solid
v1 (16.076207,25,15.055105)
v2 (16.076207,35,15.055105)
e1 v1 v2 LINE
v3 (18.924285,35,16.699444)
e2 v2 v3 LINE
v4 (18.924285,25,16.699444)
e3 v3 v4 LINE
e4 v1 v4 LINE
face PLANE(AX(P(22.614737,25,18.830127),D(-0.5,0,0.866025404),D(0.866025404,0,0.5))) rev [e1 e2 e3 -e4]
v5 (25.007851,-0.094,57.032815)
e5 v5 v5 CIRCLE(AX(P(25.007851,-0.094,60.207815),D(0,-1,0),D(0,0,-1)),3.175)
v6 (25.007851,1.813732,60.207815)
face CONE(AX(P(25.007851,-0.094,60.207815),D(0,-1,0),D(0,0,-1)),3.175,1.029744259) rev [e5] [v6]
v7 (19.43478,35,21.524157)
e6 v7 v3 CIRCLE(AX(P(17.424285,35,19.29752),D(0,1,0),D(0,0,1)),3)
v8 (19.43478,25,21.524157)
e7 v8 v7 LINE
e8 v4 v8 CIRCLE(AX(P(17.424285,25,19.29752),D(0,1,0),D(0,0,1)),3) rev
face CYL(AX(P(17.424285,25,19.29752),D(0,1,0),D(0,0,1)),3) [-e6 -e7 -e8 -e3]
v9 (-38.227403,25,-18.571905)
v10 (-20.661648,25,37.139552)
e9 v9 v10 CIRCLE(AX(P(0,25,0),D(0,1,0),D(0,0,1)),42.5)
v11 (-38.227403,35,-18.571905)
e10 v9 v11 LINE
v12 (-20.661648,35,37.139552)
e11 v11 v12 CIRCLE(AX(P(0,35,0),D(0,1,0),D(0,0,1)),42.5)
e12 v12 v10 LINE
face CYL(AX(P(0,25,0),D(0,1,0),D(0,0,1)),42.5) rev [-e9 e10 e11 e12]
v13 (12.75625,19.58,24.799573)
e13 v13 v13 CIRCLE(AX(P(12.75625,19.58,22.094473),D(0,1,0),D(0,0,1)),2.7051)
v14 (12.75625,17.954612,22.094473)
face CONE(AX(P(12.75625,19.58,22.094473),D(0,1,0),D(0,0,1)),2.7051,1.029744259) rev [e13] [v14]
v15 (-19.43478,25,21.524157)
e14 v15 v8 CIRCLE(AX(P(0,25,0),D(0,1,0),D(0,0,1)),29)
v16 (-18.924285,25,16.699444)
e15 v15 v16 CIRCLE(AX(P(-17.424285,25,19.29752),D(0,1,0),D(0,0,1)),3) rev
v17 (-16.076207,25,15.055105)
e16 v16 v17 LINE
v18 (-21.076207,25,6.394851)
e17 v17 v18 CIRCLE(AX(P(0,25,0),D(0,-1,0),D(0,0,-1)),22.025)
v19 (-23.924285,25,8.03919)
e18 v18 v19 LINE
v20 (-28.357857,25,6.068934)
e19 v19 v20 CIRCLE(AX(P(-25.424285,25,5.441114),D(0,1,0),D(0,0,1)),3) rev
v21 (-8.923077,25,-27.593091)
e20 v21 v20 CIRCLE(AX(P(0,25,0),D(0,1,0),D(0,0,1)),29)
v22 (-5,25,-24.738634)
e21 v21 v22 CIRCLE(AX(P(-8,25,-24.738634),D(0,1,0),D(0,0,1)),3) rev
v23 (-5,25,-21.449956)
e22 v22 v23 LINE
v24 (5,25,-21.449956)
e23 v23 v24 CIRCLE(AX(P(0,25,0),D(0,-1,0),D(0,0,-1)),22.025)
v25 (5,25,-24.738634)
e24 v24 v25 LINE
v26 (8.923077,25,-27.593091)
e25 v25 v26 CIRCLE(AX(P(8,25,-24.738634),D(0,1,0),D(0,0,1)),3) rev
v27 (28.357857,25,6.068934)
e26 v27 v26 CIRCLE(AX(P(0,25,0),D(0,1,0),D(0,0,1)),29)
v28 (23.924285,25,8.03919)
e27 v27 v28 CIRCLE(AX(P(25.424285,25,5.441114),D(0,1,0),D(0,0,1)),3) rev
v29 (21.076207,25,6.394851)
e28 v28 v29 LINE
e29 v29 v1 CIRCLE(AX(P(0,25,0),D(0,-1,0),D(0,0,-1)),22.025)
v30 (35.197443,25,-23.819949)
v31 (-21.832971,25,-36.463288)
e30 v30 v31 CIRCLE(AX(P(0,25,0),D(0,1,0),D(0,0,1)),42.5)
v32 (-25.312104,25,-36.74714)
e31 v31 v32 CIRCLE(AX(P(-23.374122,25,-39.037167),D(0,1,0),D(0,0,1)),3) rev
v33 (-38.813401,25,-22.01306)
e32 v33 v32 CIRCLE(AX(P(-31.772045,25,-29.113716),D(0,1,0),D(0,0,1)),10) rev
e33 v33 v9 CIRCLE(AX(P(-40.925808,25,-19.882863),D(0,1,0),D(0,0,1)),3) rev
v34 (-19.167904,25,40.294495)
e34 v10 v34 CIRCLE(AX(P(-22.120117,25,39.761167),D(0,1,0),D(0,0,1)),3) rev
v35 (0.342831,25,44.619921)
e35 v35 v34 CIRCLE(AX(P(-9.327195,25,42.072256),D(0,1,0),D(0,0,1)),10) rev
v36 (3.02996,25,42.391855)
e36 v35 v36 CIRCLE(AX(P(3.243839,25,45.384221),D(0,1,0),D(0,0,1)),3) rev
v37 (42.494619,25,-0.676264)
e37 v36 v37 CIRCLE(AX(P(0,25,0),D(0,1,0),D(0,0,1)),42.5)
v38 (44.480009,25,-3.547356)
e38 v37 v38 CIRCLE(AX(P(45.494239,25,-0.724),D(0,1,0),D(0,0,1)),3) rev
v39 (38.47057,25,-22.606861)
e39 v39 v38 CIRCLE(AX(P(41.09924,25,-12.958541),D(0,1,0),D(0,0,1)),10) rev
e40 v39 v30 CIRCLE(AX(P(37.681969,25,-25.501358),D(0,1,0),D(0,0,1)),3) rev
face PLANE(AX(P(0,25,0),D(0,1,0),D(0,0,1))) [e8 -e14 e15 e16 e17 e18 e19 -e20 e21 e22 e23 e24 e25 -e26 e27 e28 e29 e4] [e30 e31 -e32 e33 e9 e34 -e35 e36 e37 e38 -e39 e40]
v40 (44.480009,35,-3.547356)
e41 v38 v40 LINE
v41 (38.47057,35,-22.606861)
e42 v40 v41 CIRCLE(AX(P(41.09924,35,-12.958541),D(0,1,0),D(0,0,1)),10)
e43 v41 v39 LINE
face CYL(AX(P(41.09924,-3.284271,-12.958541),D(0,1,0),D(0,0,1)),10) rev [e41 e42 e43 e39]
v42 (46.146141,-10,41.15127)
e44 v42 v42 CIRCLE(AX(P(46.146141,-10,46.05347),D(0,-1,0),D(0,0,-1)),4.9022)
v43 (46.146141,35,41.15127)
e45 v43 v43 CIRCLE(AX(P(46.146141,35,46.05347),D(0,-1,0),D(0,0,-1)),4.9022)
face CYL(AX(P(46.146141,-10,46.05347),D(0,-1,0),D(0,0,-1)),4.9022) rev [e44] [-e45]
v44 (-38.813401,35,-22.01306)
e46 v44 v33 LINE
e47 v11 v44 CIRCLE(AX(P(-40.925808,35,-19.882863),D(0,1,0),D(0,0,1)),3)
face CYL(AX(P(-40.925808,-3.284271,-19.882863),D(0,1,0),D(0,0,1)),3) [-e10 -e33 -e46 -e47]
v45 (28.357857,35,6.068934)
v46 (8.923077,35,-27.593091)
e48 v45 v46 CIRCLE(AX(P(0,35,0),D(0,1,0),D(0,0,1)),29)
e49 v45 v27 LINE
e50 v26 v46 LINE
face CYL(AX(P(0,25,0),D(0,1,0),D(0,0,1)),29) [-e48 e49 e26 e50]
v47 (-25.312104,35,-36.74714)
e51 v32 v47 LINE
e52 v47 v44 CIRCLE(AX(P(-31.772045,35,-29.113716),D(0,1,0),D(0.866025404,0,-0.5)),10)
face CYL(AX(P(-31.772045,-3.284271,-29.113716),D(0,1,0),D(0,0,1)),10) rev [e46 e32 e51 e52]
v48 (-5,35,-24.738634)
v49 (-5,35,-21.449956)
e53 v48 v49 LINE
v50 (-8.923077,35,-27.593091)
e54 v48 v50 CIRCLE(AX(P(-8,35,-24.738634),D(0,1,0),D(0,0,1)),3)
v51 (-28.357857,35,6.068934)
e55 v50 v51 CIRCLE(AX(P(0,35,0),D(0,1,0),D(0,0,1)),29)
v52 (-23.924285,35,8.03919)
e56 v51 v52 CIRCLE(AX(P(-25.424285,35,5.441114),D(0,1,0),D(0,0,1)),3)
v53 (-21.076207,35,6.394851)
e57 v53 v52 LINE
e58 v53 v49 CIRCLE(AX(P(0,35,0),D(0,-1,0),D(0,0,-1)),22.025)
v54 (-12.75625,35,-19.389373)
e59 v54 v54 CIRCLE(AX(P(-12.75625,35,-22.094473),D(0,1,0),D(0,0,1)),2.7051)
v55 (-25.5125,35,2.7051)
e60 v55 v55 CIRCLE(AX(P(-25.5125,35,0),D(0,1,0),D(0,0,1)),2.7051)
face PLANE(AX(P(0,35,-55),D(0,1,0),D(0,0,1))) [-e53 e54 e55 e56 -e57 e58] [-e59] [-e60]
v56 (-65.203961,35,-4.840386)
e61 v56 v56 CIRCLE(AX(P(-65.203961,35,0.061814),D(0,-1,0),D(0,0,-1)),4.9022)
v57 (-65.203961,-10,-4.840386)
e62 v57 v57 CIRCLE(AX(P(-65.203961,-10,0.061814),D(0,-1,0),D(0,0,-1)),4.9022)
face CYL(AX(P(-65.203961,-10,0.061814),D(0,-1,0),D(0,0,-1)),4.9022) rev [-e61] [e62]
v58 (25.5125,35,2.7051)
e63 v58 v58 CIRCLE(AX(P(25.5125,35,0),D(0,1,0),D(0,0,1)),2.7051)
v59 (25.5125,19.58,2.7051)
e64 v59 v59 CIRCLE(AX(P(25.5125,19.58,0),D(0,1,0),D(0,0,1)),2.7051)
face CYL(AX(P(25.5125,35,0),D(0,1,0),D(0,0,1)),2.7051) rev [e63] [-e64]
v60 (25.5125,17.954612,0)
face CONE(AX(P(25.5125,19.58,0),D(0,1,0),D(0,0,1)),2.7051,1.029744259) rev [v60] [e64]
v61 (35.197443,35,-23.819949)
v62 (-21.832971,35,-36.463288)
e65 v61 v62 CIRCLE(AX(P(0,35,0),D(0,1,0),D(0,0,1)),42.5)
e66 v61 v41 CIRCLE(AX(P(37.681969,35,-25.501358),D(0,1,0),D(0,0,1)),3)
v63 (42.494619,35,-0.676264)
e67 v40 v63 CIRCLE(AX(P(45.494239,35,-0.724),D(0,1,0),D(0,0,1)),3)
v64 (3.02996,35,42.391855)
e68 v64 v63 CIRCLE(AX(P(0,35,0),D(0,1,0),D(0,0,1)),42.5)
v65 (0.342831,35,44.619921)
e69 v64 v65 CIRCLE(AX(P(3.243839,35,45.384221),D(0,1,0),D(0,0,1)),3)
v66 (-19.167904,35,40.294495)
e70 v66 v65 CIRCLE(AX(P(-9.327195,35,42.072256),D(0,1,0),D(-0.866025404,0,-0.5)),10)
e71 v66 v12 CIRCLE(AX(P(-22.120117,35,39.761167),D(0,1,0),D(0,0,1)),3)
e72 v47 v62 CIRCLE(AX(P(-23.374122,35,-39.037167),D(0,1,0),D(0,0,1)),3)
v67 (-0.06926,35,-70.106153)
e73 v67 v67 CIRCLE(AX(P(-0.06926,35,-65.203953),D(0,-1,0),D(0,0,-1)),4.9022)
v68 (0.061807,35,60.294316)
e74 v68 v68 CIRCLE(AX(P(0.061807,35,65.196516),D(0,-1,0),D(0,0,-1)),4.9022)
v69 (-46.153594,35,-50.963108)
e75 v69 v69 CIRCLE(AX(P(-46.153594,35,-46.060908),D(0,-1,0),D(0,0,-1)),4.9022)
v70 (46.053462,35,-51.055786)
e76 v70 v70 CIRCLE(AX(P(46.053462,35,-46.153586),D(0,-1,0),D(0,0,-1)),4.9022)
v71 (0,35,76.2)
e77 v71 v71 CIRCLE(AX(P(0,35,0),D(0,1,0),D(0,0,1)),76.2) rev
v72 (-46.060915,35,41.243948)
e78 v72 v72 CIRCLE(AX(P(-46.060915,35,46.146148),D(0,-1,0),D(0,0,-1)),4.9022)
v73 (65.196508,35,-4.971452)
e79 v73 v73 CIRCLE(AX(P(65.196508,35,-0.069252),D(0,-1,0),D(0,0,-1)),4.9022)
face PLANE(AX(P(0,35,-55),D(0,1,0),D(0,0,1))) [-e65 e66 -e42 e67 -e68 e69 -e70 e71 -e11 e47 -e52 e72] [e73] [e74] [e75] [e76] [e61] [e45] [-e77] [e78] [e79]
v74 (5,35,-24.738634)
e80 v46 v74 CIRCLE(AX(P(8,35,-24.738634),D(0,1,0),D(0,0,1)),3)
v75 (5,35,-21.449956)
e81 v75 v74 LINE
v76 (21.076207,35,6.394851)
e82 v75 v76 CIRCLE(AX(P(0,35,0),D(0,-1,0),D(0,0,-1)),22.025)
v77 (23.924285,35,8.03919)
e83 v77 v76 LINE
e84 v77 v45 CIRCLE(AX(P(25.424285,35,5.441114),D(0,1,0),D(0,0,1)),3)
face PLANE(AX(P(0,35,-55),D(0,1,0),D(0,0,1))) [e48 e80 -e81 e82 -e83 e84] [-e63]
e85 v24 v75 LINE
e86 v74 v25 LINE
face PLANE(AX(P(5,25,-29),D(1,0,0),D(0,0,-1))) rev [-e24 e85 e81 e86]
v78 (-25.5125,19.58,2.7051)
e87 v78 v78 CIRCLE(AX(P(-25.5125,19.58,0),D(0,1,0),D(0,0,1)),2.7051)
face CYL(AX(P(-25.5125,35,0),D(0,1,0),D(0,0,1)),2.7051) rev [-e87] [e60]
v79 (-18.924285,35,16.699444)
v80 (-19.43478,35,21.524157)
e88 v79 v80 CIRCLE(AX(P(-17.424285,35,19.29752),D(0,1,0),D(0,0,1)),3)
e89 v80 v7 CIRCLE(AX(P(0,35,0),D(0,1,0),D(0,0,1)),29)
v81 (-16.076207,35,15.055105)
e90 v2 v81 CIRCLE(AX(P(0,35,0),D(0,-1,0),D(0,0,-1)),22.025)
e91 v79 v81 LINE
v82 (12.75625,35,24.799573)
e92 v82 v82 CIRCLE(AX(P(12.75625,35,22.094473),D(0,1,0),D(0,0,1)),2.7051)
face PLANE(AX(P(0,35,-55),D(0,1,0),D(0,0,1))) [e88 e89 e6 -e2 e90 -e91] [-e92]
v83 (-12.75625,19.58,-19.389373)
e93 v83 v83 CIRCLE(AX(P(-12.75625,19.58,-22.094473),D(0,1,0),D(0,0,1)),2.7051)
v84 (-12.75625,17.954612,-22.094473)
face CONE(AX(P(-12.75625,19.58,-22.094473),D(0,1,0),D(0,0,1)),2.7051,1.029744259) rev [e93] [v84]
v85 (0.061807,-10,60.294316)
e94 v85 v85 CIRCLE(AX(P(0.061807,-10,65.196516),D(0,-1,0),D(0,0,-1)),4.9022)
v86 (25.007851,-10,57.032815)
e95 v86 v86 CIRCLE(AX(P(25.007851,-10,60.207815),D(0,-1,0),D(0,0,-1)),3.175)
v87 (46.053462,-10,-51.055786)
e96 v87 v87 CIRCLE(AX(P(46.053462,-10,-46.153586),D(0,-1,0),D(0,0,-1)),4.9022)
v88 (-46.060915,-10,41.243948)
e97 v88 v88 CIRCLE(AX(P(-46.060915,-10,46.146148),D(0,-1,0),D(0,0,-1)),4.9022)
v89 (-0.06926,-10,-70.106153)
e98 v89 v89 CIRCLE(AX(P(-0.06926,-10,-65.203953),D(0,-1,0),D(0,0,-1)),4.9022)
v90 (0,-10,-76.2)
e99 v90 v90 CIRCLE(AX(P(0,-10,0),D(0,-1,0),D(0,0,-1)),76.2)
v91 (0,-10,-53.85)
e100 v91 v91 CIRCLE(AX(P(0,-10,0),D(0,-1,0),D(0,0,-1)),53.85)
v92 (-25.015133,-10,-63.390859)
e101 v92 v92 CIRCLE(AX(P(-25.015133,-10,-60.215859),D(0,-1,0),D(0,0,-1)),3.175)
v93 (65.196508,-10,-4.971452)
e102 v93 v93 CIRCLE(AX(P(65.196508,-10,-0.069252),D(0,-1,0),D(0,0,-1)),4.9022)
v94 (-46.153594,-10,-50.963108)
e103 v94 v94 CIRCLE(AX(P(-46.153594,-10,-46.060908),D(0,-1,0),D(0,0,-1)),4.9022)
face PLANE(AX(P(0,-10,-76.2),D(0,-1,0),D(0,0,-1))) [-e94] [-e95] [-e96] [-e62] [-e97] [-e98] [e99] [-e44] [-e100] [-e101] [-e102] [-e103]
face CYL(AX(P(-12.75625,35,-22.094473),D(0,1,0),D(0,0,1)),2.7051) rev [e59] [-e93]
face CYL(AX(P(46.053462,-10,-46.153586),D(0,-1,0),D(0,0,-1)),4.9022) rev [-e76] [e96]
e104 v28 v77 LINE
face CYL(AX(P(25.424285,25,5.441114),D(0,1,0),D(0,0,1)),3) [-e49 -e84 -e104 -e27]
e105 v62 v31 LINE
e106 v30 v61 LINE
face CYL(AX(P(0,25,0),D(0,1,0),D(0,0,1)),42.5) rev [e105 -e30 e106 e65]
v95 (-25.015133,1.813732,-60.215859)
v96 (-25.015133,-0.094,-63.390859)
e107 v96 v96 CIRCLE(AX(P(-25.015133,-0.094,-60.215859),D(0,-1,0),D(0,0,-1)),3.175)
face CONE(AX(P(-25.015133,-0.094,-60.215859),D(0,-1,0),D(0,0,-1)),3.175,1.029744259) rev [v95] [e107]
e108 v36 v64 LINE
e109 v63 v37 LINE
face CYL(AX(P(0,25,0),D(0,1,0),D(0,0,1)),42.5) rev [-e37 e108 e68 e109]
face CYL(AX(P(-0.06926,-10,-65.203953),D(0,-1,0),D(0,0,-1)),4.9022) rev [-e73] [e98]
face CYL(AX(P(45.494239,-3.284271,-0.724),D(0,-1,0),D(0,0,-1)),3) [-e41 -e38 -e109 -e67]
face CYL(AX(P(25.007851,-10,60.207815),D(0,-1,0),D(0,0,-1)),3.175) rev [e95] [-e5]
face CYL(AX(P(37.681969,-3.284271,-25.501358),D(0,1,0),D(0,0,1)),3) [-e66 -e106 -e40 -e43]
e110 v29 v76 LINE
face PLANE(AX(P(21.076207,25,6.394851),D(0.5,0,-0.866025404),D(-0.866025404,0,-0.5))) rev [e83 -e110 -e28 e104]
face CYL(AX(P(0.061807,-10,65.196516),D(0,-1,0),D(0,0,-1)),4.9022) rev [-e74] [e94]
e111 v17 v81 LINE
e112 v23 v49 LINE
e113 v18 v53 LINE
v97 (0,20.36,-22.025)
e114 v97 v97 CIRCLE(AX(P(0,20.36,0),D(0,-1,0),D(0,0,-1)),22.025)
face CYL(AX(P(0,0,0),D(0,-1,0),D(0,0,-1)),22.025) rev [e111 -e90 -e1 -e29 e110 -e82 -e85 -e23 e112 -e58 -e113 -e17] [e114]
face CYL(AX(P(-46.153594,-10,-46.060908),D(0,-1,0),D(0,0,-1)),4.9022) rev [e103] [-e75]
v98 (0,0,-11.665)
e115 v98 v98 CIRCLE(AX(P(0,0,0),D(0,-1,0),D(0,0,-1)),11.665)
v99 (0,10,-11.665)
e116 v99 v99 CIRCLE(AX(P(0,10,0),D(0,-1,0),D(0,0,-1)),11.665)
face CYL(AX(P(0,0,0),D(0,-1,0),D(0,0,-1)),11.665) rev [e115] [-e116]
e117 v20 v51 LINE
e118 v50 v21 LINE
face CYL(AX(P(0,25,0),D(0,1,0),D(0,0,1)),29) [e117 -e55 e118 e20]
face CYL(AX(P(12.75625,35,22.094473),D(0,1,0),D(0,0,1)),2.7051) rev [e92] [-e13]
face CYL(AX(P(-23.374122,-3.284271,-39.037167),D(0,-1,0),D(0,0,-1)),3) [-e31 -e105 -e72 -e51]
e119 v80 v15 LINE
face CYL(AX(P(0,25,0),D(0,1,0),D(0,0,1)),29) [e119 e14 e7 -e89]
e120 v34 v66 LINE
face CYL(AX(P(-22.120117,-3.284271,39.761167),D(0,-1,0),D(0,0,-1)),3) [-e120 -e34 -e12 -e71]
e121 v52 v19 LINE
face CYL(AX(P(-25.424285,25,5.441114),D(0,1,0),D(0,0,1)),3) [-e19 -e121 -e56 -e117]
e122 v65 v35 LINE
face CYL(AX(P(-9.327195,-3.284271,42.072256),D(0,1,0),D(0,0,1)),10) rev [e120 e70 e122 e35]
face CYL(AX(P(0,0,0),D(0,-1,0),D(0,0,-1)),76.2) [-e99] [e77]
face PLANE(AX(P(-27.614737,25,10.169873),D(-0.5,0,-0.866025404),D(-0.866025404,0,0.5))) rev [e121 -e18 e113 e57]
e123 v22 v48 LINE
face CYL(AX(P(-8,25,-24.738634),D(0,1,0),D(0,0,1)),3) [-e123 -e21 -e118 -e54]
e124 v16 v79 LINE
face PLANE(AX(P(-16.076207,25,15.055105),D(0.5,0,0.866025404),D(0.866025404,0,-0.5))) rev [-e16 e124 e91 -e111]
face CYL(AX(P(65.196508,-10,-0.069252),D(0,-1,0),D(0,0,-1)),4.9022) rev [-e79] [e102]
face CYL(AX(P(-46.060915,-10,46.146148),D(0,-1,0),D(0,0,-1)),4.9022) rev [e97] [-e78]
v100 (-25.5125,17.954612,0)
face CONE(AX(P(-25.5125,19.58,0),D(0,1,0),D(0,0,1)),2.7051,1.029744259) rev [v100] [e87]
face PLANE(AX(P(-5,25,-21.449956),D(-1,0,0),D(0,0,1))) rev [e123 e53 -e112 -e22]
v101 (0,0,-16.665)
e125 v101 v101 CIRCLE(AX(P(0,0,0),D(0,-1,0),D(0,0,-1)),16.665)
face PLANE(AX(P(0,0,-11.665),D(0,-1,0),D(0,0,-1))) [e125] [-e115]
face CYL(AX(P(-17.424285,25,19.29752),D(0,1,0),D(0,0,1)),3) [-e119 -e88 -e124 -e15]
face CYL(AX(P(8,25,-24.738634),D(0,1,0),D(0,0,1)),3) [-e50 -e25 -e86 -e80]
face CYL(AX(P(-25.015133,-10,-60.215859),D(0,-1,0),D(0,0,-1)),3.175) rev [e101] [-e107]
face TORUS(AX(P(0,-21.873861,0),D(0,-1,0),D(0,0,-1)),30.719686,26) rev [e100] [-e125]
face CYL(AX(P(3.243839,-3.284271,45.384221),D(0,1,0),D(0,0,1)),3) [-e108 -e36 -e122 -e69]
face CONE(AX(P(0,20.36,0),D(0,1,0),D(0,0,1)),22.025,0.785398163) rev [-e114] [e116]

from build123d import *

# Parameters (mm, degrees)
SKETCH6_R                      = 42.5
SKETCH6_R_2                    = 29
CUT_EXTRUDE3_DEPTH             = 10
SKETCH7_W                      = 10
SKETCH7_H                      = 7.550043706
CUT_EXTRUDE4_DEPTH             = 10
CIRPATTERN2_COUNT              = 3
DELETEFACE1_START              = 15
DELETEFACE1_OUTLINE_R          = 76.2
DELETEFACE1_OUTLINE_R_2        = 55
DELETEFACE1_DEPTH              = 20
F_3_8_CLEARANCE_HOLE1_D        = 9.8044
SKETCH46_R                     = 10
CUT_EXTRUDE5_DEPTH             = 10
CIRPATTERN6_COUNT              = 3
FILLET2_R                      = 3
CIRPATTERN7_COUNT              = 6
F_1_4_0_2500_DOWEL_HOLE1_D     = 6.35
F_1_4_0_2500_DOWEL_HOLE1_DEPTH = 9.906
F_1_4_0_2500_DOWEL_HOLE1_TIP   = 1.907732465


# Read off the part's stored shape, not the designer's step: DeleteFace1
with BuildPart() as part:
    # Sketch3 → Revolve1 (revolve)
    with BuildSketch(Plane(origin=(0, 0, 0), x_dir=(0, 0, -1), z_dir=(1, 0, 0))):
        with BuildLine():
            Line((76.2, 15), (55, 15))
            Line((55, 15), (55, 35))
            Line((55, 35), (22.025, 35))
            Line((22.025, 35), (22.025, 20.36))
            Line((22.025, 20.36), (11.665, 10))
            Line((11.665, 10), (11.665, 0))
            Line((11.665, 0), (16.665, 0))
            ThreePointArc((16.665, 0), (37.471852779, 3.234070807), (53.85, -10))
            Line((53.85, -10), (76.2, -10))
            Line((76.2, -10), (76.2, 15))
        make_face()
    revolve(axis=Axis((0, 0, 0), (0, 1, 0)))

    # Sketch6 → Cut-Extrude3 (cut)
    with BuildSketch(Plane(origin=(0, 35, 0), x_dir=(1, 0, 0), z_dir=(0, 1, 0))):
        with Locations(Location((0, 0, 0), (0, 0, 270))):
            Circle(SKETCH6_R)
        with Locations(Location((0, 0, 0), (0, 0, 270))):
            Circle(SKETCH6_R_2, mode=Mode.SUBTRACT)
    extrude(amount=-CUT_EXTRUDE3_DEPTH, mode=Mode.SUBTRACT)

    # Sketch7 → Cut-Extrude4 (cut)
    with BuildSketch(Plane(origin=(0, 35, 0), x_dir=(1, 0, 0), z_dir=(0, 1, 0))):
        with Locations((0, 25.224978147)):
            Rectangle(SKETCH7_W, SKETCH7_H)
    cut_extrude4 = extrude(amount=-CUT_EXTRUDE4_DEPTH, mode=Mode.SUBTRACT)

    # CirPattern2: Cut-Extrude4 ×3 about axis
    cirpattern2_axis = Axis((0, 0, 0), (0, 1, 0))
    for i in range(1, CIRPATTERN2_COUNT):
        add(cut_extrude4.rotate(cirpattern2_axis, i * 360 / CIRPATTERN2_COUNT), mode=Mode.SUBTRACT)

    # DeleteFace1 outline → DeleteFace1 (add)
    with BuildSketch(Plane(origin=(0, 0, 0), x_dir=(1, 0, 0), z_dir=(0, 1, 0)).offset(DELETEFACE1_START)):
        Circle(DELETEFACE1_OUTLINE_R)
        Circle(DELETEFACE1_OUTLINE_R_2, mode=Mode.SUBTRACT)
    extrude(amount=DELETEFACE1_DEPTH)

    # 3/8 Clearance Hole1 (through all)
    with Locations(Plane(origin=(0, -10, 0), x_dir=(-1, 0, 0), z_dir=(0, -1, 0))):
        with Locations((46.153593538, 46.060907757), (65.203960939, -0.061814491), (46.060915247, -46.146148146), (-0.061807016, -65.196515566), (-46.146140681, -46.053469867), (-65.196508083, 0.069252405), (-46.053462365, 46.15358606), (0.069259897, 65.203953456)):
            Hole(F_3_8_CLEARANCE_HOLE1_D / 2)

    # Sketch46 → Cut-Extrude5 (cut)
    with BuildSketch(Plane(origin=(0, 35, 0), x_dir=(1, 0, 0), z_dir=(0, 1, 0))):
        with Locations((41.099239846, 12.958540547)):
            Circle(SKETCH46_R)
    cut_extrude5 = extrude(amount=-CUT_EXTRUDE5_DEPTH, mode=Mode.SUBTRACT)

    # CirPattern6: Cut-Extrude5 ×3 about axis
    cirpattern6_axis = Axis((0, 0, 0), (0, 1, 0))
    for i in range(1, CIRPATTERN6_COUNT):
        add(cut_extrude5.rotate(cirpattern6_axis, i * 360 / CIRPATTERN6_COUNT), mode=Mode.SUBTRACT)

    # Fillet2
    fillet2_edges = [part.edges().sort_by_distance(p)[0] for p in [
        (36.469652208, 30, -21.822338734),
        (42.390969445, 30, -3.042319763),
        (-37.133525818, 30, -20.672475912),
        (-23.830210924, 30, -35.190496549),
        (0.66387361, 30, 42.494814646),
        (-18.560758521, 30, 38.232816312),
        (5, 30, -28.565713714),
        (-5, 30, -28.565713714),
        (27.238633754, 30, 9.952729838),
        (22.238633754, 30, 18.612983876),
        (-22.238633754, 30, 18.612983876),
        (-27.238633754, 30, 9.952729838),
    ]]
    fillet(fillet2_edges, radius=FILLET2_R)

    # Sketch51 → 1/4-28 Tapped Hole1 (revolve, cut)
    with BuildSketch(Plane(origin=(25.5125, 35, 0), x_dir=(0, 0, 1), z_dir=(1, 0, 0))):
        Polygon((0, 0), (0, 17.045388061), (2.7051, 15.42), (2.7051, 0), align=None)
    f_1_4_28_tapped_hole1 = revolve(axis=Axis((25.5125, 41.35, 0), (0, -1, 0)), mode=Mode.SUBTRACT)

    # CirPattern7: 1/4-28 Tapped Hole1 ×6 about axis, 2 skipped
    cirpattern7_axis = Axis((0, 0, 0), (0, -1, 0))
    add([f_1_4_28_tapped_hole1.rotate(cirpattern7_axis, i * 360 / CIRPATTERN7_COUNT) for i in range(1, CIRPATTERN7_COUNT) if i not in (2, 5)], mode=Mode.SUBTRACT)

    # 1/4 (0.2500) Dowel Hole1
    with Locations(Plane(origin=(0, -10, 0), x_dir=(-1, 0, 0), z_dir=(0, -1, 0))):
        with Locations((-25.007850676, -60.207814752), (25.01513322, 60.21585851)):
            Hole(F_1_4_0_2500_DOWEL_HOLE1_D / 2, depth=F_1_4_0_2500_DOWEL_HOLE1_DEPTH)
            with Locations((0, 0, -(F_1_4_0_2500_DOWEL_HOLE1_DEPTH + F_1_4_0_2500_DOWEL_HOLE1_TIP / 2))):  # 118° drill point
                Cone(0, F_1_4_0_2500_DOWEL_HOLE1_D / 2, F_1_4_0_2500_DOWEL_HOLE1_TIP, mode=Mode.SUBTRACT)


solid = part.part
